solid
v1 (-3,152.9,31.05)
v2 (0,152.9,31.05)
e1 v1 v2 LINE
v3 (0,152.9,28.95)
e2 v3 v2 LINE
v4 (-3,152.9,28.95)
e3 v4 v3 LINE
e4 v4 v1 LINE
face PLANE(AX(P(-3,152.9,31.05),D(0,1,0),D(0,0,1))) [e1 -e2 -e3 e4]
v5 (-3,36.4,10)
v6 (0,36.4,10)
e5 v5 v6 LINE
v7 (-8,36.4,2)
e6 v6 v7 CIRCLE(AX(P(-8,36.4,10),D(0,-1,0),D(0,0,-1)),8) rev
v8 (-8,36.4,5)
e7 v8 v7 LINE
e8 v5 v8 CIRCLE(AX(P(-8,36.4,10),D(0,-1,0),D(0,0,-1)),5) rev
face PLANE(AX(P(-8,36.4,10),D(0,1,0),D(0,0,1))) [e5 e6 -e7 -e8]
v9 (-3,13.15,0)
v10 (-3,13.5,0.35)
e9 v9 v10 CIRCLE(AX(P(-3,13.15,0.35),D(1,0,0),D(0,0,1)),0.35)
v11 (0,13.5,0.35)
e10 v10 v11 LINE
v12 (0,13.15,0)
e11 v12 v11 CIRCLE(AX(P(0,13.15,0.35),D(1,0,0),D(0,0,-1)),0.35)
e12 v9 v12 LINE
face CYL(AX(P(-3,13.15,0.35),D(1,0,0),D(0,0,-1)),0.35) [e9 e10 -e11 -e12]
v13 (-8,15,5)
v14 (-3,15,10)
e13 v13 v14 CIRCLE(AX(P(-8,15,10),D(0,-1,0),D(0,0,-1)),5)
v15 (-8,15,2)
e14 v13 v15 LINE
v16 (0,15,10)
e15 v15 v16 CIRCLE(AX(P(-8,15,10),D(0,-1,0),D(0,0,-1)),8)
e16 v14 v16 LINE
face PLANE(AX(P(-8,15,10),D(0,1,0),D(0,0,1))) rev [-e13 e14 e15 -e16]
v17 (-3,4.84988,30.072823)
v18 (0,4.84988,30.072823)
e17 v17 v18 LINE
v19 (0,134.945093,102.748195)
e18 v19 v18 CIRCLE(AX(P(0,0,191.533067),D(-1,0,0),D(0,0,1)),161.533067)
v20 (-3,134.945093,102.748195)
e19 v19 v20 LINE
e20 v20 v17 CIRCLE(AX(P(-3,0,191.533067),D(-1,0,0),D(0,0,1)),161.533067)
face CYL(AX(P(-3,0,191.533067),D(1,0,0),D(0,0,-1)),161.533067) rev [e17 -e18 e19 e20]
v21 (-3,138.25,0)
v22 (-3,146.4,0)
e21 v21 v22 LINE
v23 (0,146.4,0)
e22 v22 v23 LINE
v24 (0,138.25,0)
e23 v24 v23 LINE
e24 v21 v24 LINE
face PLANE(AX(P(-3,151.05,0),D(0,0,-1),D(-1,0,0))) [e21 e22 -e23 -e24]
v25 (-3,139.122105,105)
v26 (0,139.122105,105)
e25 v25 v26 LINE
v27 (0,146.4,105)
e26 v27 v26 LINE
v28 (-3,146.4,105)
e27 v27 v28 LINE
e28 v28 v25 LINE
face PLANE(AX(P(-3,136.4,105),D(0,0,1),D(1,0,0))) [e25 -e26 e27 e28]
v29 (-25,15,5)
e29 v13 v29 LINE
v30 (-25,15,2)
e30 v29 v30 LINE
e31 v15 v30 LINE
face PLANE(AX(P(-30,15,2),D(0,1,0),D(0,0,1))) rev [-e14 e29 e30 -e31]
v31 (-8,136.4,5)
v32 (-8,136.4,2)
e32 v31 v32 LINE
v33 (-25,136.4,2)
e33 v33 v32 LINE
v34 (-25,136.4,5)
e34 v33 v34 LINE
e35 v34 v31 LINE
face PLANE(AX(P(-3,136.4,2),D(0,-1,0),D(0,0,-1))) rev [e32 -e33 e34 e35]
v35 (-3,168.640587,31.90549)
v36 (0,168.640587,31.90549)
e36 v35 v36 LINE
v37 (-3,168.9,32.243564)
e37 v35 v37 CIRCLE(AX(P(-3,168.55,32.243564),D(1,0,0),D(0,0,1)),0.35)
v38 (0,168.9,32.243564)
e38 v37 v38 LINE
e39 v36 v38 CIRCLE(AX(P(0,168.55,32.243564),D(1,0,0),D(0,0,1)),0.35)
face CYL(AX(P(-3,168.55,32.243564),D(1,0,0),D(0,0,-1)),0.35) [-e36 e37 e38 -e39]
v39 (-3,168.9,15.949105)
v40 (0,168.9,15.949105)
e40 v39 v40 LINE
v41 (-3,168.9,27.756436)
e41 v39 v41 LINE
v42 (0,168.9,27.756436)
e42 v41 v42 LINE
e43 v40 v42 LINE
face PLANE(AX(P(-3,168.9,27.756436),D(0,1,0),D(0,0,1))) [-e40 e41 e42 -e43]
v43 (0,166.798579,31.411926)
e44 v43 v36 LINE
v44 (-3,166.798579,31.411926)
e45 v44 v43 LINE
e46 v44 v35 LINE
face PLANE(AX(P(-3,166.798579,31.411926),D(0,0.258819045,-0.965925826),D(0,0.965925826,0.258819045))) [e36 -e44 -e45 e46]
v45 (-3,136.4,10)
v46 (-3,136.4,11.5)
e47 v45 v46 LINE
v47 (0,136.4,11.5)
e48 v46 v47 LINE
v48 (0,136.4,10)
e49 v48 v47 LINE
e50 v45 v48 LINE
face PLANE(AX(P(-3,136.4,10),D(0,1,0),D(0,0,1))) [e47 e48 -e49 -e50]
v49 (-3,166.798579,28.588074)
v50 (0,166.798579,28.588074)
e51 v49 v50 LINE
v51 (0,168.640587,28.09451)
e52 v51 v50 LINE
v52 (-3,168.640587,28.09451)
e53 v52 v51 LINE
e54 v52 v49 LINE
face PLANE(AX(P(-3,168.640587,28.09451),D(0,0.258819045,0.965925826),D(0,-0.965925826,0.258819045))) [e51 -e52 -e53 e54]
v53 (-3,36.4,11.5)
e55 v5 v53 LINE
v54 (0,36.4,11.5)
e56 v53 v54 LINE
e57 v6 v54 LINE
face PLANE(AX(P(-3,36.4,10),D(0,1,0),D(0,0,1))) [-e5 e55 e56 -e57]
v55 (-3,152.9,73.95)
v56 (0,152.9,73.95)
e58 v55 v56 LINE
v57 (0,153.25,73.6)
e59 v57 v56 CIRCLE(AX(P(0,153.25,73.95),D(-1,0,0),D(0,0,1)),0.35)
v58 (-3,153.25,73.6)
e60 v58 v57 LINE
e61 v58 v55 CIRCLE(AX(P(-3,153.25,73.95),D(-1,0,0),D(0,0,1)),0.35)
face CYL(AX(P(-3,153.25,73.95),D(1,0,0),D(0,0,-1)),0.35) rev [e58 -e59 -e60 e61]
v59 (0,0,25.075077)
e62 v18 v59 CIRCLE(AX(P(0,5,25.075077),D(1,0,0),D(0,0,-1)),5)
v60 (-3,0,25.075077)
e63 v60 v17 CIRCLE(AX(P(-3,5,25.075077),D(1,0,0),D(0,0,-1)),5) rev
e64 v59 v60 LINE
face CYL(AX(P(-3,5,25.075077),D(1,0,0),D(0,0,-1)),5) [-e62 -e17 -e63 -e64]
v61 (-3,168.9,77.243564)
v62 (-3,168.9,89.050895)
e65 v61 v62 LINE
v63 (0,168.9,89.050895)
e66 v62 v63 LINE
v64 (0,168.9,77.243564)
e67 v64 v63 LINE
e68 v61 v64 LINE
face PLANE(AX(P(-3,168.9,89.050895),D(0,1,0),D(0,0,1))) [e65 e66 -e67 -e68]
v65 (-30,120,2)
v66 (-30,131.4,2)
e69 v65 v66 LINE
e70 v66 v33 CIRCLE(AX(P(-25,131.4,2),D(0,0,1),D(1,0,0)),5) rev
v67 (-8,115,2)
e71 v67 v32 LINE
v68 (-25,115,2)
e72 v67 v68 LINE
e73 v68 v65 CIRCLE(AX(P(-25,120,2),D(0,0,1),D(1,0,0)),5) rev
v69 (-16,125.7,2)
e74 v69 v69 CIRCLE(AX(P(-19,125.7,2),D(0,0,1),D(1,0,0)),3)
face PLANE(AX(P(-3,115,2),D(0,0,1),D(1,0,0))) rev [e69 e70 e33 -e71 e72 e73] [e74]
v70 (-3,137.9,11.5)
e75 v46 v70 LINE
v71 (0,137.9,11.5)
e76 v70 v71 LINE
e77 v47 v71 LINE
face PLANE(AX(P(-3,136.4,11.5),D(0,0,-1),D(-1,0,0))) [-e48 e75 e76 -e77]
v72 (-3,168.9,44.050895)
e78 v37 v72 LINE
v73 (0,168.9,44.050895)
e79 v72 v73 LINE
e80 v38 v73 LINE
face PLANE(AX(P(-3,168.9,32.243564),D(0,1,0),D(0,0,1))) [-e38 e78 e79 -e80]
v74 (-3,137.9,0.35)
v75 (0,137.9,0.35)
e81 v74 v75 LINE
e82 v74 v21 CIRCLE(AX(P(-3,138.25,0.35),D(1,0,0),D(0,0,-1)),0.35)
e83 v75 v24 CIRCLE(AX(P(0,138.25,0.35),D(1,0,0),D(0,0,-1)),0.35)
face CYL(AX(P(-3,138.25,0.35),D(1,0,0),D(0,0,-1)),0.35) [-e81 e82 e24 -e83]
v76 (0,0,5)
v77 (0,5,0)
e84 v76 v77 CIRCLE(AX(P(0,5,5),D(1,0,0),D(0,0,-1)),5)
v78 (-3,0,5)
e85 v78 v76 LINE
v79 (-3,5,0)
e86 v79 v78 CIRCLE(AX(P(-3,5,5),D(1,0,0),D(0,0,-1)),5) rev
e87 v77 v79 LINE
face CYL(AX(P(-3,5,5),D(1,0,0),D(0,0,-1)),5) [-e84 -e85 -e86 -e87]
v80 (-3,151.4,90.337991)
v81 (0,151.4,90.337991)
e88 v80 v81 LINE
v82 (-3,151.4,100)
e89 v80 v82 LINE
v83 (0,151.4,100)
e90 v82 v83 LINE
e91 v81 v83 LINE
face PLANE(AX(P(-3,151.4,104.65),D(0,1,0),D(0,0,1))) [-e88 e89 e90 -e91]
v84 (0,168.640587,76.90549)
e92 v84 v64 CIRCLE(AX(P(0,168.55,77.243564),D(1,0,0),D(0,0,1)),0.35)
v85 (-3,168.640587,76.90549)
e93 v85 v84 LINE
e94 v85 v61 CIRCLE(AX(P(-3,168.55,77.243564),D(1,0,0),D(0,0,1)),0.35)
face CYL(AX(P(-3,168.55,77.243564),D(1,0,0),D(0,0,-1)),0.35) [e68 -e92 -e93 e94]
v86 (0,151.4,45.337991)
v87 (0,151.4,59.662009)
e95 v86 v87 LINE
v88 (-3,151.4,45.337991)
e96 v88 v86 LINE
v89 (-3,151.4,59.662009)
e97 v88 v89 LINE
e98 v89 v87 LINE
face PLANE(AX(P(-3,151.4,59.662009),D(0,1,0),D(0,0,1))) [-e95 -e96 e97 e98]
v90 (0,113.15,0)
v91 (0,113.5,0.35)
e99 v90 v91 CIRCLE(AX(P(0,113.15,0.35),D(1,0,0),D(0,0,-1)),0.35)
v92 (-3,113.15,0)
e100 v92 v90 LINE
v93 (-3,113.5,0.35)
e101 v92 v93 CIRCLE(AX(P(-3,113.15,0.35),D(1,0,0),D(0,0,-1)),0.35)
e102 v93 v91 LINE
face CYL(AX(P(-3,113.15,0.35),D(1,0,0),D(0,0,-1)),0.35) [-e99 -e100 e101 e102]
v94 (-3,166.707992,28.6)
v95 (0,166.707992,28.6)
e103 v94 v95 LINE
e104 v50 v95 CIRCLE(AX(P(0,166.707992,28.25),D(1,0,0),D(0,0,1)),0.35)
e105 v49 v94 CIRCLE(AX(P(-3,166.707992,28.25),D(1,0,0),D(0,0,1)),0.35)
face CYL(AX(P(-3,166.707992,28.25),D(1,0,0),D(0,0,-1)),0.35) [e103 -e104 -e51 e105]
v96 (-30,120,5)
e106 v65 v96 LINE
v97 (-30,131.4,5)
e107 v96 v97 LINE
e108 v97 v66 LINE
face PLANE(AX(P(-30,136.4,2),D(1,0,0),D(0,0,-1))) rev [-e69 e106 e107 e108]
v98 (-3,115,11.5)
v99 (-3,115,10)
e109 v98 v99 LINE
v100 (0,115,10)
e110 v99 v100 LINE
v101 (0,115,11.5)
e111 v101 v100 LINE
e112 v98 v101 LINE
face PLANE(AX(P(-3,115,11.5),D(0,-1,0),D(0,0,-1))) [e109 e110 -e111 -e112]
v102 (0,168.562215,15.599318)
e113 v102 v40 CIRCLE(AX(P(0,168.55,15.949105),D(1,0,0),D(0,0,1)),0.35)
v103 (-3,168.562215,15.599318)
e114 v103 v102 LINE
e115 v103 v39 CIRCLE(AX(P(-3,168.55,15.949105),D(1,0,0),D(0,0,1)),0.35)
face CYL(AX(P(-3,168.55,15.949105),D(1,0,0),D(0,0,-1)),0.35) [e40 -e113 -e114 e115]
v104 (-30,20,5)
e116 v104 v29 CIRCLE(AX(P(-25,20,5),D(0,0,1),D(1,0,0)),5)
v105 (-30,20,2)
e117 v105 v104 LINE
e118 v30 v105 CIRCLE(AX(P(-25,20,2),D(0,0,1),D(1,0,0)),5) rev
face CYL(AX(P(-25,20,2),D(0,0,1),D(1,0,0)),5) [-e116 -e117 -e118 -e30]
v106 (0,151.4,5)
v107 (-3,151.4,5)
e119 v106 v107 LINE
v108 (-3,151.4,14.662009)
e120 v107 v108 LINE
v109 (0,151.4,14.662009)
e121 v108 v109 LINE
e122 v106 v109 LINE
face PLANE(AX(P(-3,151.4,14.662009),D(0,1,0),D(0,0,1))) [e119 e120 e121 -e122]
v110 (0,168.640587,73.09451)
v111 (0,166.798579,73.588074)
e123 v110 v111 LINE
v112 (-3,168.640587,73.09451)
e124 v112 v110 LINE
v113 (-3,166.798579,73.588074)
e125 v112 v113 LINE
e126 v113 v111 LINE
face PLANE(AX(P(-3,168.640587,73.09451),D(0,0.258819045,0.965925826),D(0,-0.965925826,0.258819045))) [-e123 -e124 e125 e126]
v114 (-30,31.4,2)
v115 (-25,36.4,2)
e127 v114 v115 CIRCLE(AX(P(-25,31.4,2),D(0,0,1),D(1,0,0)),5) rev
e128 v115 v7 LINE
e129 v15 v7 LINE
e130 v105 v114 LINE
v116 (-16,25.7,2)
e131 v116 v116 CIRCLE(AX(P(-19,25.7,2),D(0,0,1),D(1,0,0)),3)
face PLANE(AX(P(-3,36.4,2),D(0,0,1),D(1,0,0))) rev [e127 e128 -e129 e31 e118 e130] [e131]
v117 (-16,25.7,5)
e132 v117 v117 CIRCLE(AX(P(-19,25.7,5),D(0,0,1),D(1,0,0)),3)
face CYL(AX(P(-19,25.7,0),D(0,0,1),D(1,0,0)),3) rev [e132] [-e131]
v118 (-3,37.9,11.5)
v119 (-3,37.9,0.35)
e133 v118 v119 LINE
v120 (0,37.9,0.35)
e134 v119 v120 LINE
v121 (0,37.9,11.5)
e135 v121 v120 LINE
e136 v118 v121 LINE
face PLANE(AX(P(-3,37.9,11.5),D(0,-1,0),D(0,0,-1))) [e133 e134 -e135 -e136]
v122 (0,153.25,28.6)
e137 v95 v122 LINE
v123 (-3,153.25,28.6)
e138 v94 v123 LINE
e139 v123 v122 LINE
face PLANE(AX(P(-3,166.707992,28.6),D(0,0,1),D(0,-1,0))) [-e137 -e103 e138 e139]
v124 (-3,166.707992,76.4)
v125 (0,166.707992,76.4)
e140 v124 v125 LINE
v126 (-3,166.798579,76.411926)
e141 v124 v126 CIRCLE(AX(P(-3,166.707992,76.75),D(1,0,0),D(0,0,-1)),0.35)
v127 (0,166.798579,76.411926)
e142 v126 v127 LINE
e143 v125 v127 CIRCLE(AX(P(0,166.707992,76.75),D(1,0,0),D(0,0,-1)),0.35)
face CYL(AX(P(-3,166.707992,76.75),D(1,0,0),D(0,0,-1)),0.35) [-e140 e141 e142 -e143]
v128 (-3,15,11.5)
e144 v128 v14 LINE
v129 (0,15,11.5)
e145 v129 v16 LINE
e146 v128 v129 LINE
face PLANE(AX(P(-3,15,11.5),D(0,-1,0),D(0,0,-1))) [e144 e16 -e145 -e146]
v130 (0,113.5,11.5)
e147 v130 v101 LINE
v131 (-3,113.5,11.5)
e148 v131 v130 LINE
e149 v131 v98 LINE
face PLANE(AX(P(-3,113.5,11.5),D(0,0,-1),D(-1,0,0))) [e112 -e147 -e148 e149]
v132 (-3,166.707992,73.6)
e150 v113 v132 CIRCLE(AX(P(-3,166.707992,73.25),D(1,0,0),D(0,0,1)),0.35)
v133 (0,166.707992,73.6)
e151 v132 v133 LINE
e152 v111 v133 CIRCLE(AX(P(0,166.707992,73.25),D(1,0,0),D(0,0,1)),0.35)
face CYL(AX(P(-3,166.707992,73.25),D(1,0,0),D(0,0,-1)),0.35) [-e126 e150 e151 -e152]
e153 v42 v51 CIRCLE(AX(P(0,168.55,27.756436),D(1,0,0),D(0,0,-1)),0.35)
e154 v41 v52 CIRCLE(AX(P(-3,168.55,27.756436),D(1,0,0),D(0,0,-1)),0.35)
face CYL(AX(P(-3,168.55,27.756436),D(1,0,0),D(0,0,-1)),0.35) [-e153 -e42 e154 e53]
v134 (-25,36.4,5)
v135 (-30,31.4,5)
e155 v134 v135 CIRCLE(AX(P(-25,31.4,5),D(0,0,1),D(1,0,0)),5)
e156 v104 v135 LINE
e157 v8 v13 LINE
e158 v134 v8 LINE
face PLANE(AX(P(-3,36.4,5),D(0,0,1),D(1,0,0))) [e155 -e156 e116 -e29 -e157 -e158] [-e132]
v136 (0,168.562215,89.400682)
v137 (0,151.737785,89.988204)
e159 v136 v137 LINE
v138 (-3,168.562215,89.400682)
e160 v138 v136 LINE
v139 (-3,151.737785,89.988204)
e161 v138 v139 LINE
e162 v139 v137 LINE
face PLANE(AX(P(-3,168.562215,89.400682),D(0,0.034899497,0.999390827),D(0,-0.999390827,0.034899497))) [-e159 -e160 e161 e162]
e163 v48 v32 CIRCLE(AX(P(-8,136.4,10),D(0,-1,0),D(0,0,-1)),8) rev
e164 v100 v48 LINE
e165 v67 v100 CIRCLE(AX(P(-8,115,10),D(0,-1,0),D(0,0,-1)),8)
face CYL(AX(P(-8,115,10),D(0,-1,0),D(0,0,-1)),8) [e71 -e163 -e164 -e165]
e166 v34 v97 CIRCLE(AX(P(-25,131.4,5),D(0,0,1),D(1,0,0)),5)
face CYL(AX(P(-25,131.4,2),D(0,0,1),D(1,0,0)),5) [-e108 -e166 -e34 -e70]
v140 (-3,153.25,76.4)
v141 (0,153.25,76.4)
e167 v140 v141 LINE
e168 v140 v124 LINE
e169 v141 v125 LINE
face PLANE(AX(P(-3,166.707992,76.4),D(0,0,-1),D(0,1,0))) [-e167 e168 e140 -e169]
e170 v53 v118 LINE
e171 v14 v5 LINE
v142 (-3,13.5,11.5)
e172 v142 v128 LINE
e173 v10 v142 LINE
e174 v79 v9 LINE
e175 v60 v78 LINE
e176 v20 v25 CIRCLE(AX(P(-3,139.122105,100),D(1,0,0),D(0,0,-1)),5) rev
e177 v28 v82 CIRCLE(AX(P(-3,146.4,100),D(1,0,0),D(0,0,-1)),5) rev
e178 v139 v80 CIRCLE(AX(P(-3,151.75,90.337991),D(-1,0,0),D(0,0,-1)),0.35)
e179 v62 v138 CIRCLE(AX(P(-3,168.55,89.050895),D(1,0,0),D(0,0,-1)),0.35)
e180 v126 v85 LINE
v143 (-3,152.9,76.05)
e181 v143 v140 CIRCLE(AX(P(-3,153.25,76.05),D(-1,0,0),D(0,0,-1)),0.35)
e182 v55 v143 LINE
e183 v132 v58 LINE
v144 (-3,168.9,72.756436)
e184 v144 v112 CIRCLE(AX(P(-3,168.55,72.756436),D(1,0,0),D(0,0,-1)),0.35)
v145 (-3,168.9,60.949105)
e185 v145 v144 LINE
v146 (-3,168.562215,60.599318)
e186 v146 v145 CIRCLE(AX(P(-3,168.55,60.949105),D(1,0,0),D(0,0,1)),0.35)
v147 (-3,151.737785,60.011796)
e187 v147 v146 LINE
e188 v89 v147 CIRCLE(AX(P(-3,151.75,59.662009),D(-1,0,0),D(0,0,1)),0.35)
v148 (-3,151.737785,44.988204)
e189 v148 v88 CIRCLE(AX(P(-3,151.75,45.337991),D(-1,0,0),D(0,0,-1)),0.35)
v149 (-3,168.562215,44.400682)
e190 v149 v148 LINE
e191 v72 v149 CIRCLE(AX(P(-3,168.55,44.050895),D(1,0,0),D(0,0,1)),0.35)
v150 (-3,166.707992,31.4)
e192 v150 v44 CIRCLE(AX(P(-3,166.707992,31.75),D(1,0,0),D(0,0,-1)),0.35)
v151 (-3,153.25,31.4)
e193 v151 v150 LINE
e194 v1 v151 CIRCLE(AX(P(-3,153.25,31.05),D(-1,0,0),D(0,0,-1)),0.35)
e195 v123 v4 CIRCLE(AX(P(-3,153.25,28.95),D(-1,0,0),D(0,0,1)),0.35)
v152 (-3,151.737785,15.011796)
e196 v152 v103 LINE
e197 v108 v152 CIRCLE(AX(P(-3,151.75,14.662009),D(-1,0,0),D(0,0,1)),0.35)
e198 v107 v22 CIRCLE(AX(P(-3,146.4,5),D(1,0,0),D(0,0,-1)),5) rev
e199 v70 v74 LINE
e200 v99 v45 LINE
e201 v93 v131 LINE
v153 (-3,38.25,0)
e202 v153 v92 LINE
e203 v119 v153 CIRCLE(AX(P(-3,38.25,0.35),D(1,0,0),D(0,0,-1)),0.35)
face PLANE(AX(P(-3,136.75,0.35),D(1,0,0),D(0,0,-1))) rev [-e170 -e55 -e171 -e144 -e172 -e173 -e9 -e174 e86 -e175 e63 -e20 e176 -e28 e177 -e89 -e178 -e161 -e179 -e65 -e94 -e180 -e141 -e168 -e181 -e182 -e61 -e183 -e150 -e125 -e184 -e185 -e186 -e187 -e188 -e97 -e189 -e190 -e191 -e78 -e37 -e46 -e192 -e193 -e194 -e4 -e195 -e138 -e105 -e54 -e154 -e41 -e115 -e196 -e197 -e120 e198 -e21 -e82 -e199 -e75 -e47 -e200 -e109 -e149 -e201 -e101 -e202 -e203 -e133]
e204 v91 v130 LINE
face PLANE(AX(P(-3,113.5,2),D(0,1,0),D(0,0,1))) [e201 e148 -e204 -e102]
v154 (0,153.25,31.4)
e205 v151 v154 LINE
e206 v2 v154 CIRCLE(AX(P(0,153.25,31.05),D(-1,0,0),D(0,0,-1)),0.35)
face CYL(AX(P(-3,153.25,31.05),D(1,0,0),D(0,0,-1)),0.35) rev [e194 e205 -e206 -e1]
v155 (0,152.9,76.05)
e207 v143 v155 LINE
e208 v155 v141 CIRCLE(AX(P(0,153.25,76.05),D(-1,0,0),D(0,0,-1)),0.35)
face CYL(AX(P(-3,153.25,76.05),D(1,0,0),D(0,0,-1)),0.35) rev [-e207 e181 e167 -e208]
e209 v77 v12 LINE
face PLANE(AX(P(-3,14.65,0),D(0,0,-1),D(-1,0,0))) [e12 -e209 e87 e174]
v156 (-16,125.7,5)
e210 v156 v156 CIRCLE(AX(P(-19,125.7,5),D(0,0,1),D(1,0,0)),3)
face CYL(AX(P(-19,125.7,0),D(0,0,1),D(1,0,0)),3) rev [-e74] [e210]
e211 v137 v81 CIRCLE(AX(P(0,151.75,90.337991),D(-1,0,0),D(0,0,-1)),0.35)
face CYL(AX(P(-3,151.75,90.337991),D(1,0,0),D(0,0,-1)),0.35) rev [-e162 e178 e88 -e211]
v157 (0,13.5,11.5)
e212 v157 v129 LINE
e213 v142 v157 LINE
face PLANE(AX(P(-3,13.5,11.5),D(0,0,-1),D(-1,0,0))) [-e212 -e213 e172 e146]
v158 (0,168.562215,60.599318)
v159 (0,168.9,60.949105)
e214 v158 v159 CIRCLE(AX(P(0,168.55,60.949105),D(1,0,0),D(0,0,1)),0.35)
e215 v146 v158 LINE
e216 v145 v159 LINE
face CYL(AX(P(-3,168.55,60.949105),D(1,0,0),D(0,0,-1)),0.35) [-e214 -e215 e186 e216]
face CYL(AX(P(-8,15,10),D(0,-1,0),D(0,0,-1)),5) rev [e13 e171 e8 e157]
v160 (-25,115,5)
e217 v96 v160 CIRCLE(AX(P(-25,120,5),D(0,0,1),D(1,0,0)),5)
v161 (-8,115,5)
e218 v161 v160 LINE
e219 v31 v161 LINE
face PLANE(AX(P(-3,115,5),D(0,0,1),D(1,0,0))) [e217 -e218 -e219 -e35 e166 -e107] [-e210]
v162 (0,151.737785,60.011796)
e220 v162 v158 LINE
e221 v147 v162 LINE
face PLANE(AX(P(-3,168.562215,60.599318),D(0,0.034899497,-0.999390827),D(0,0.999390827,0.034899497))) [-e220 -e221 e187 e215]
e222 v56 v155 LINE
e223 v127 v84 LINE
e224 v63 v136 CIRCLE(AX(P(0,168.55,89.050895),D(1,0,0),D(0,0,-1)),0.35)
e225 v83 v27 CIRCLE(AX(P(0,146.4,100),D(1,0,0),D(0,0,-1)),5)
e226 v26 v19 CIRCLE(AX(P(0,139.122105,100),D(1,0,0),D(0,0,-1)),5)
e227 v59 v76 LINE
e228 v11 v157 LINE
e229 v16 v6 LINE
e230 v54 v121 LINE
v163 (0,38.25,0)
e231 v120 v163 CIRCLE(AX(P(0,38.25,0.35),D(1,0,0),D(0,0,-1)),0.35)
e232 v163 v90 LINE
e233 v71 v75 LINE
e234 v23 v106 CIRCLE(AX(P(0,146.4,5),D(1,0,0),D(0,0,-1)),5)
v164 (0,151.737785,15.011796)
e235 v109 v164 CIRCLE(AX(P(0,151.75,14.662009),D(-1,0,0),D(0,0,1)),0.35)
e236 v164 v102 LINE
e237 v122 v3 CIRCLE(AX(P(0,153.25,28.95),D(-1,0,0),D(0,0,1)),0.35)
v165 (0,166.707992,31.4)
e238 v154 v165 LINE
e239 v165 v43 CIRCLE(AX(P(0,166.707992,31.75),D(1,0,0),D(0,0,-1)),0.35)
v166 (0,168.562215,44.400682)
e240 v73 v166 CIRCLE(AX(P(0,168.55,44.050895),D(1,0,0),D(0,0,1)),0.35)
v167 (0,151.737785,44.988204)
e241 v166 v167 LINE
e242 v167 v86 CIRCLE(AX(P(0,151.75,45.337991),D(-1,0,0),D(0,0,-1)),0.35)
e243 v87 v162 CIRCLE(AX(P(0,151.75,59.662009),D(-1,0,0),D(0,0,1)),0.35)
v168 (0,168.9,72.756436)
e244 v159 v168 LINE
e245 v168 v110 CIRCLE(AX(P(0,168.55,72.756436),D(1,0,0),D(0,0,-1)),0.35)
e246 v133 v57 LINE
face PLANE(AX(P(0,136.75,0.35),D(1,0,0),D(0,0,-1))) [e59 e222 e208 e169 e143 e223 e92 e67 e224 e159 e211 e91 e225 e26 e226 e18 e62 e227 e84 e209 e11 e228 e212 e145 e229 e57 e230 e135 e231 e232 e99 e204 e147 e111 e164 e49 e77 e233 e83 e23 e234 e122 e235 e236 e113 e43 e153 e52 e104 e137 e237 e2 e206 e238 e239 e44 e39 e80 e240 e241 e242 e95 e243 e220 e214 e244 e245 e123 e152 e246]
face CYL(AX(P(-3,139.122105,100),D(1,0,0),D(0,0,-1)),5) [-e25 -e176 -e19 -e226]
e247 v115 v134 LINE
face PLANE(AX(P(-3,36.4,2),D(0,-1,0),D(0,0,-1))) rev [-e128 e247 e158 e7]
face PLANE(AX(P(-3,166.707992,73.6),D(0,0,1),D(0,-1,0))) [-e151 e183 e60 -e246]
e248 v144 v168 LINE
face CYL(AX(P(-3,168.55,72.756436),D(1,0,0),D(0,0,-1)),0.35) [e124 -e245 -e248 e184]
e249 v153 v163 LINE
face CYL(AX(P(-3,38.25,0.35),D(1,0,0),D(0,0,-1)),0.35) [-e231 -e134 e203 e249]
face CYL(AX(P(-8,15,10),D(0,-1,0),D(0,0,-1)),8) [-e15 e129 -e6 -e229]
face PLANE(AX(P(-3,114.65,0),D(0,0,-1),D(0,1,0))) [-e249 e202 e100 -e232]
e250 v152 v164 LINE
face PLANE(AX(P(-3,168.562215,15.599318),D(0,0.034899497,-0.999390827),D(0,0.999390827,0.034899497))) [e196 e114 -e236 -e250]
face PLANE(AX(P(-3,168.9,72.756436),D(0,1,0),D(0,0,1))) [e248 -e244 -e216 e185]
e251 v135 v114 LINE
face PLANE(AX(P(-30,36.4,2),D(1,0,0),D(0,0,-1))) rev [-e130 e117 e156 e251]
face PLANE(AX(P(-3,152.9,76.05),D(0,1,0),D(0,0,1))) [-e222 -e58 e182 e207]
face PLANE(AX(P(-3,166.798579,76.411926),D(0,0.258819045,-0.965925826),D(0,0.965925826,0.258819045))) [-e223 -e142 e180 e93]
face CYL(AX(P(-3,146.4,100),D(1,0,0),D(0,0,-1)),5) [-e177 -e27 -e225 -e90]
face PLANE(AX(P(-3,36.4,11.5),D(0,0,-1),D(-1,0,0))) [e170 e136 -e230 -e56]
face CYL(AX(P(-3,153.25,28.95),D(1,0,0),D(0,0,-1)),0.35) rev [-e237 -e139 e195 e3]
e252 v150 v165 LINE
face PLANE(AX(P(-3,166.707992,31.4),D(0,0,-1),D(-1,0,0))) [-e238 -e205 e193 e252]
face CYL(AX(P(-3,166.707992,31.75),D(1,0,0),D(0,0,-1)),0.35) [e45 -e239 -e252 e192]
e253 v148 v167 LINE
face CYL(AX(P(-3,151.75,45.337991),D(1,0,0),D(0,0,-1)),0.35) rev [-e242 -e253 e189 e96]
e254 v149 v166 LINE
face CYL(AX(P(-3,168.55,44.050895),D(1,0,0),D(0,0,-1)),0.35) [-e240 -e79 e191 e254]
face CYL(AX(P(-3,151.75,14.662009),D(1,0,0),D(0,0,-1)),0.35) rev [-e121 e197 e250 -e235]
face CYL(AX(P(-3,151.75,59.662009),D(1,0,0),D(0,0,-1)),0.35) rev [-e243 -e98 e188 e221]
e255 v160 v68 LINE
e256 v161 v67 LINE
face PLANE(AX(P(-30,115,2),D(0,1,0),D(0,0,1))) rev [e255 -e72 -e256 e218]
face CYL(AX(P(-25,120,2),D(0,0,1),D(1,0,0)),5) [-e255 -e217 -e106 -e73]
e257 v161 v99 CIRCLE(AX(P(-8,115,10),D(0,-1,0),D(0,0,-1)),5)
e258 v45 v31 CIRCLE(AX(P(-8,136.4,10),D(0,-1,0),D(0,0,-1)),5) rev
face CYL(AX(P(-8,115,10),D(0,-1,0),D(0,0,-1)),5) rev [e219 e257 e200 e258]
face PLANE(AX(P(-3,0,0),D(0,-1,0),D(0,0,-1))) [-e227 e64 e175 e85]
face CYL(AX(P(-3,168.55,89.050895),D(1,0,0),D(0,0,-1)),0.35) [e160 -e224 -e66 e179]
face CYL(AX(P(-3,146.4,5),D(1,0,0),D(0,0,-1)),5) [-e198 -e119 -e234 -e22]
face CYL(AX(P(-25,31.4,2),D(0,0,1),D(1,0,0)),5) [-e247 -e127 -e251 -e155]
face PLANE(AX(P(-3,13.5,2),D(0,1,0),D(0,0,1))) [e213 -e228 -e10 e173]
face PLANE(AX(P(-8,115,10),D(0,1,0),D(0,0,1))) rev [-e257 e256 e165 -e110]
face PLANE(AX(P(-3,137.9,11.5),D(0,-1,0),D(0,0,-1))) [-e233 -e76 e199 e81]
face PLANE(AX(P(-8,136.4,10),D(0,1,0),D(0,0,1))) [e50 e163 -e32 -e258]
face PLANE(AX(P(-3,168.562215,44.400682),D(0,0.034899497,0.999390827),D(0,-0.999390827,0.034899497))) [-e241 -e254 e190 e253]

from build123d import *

# Parameters (mm, degrees)
BASE_FLANGE1_DEPTH   = 3
EDGE_FLANGE1_START   = 13.5
EDGE_FLANGE1_DEPTH   = 24.4
EDGE_FLANGE1_START_2 = 113.5
EDGE_FLANGE1_2_DEPTH = 24.4
EDGE_FLANGE1_3_DEPTH = 1.5
EDGE_FLANGE1_START_3 = 36.4
EDGE_FLANGE1_4_DEPTH = 1.5
EDGE_FLANGE1_5_DEPTH = 1.5
EDGE_FLANGE1_START_4 = 136.4
EDGE_FLANGE1_6_DEPTH = 1.5
EDGE_FLANGE1_START_5 = 15
EDGE_FLANGE1_7_DEPTH = 21.4
EDGE_FLANGE1_START_6 = 115
EDGE_FLANGE1_8_DEPTH = 21.4
SKETCH12_R           = 3
CUT_EXTRUDE1_DEPTH   = 199.562861583
CUT_EXTRUDE2_DEPTH   = 201.701793714
FILLET1_R            = 5


# Read off the part's stored shape, not the designer's step: Edge-Flange1
# Sheet-metal steps are written as plain solids
with BuildPart() as part:
    # Sketch1 → Base-Flange1 (new body)
    with BuildSketch(Plane(origin=(0, 0, 0), x_dir=(0, 0, -1), z_dir=(1, 0, 0))):
        with BuildLine():
            Line((-89.400682252, 168.562214824), (-89.988204282, 151.737785176))
            ThreePointArc((-89.988204282, 151.737785176), (-90.094860642, 151.49823107), (-90.337991071, 151.4))
            Line((-90.337991071, 151.4), (-104.65, 151.4))
            Line((-104.65, 151.4), (-105, 151.4))
            Line((-105, 151.4), (-105, 151.05))
            Line((-105, 151.05), (-105, 136.592313107))
            Line((-105, 136.592313107), (-105, 136.4))
            Line((-105, 136.4), (-104.837845918, 136.296993093))
            ThreePointArc((-104.837845918, 136.296993093), (-50.024333792, 77.898717236), (-30.000377542, 0.349243281))
            Line((-30.000377542, 0.349243281), (-30, 0))
            Line((-30, 0), (-29.65037836, 0))
            Line((-29.65037836, 0), (-0.35, 0))
            Line((-0.35, 0), (0, 0))
            Line((0, 0), (0, 0.35))
            Line((0, 0.35), (0, 14.65))
            ThreePointArc((0, 14.65), (-0.102512627, 14.897487373), (-0.35, 15))
            Line((-0.35, 15), (-2, 15))
            Line((-2, 15), (-2, 15.7))
            Line((-2, 15.7), (-2, 35.7))
            Line((-2, 35.7), (-2, 36.4))
            Line((-2, 36.4), (-0.35, 36.4))
            ThreePointArc((-0.35, 36.4), (-0.102512627, 36.502512627), (0, 36.75))
            Line((0, 36.75), (0, 114.65))
            ThreePointArc((0, 114.65), (-0.102512627, 114.897487373), (-0.35, 115))
            Line((-0.35, 115), (-2, 115))
            Line((-2, 115), (-2, 115.7))
            Line((-2, 115.7), (-2, 135.7))
            Line((-2, 135.7), (-2, 136.4))
            Line((-2, 136.4), (-0.35, 136.4))
            ThreePointArc((-0.35, 136.4), (-0.102512627, 136.502512627), (0, 136.75))
            Line((0, 136.75), (0, 151.05))
            Line((0, 151.05), (0, 151.4))
            Line((0, 151.4), (-0.35, 151.4))
            Line((-0.35, 151.4), (-14.662008929, 151.4))
            ThreePointArc((-14.662008929, 151.4), (-14.905139358, 151.49823107), (-15.011795718, 151.737785176))
            Line((-15.011795718, 151.737785176), (-15.599317748, 168.562214824))
            ThreePointArc((-15.599317748, 168.562214824), (-15.705974108, 168.80176893), (-15.949104537, 168.9))
            Line((-15.949104537, 168.9), (-27.756435554, 168.9))
            ThreePointArc((-27.756435554, 168.9), (-27.969502054, 168.827673669), (-28.094509593, 168.640586666))
            Line((-28.094509593, 168.640586666), (-28.588074039, 166.798579077))
            ThreePointArc((-28.588074039, 166.798579077), (-28.597005701, 166.753676579), (-28.6, 166.707992411))
            Line((-28.6, 166.707992411), (-28.6, 153.25))
            ThreePointArc((-28.6, 153.25), (-28.702512627, 153.002512627), (-28.95, 152.9))
            Line((-28.95, 152.9), (-31.05, 152.9))
            ThreePointArc((-31.05, 152.9), (-31.297487373, 153.002512627), (-31.4, 153.25))
            Line((-31.4, 153.25), (-31.4, 166.707992411))
            ThreePointArc((-31.4, 166.707992411), (-31.402994299, 166.753676579), (-31.411925961, 166.798579077))
            Line((-31.411925961, 166.798579077), (-31.905490407, 168.640586666))
            ThreePointArc((-31.905490407, 168.640586666), (-32.030497946, 168.827673669), (-32.243564446, 168.9))
            Line((-32.243564446, 168.9), (-44.050895463, 168.9))
            ThreePointArc((-44.050895463, 168.9), (-44.294025892, 168.80176893), (-44.400682252, 168.562214824))
            Line((-44.400682252, 168.562214824), (-44.988204282, 151.737785176))
            ThreePointArc((-44.988204282, 151.737785176), (-45.094860642, 151.49823107), (-45.337991071, 151.4))
            Line((-45.337991071, 151.4), (-59.662008929, 151.4))
            ThreePointArc((-59.662008929, 151.4), (-59.905139358, 151.49823107), (-60.011795718, 151.737785176))
            Line((-60.011795718, 151.737785176), (-60.599317748, 168.562214824))
            ThreePointArc((-60.599317748, 168.562214824), (-60.705974108, 168.80176893), (-60.949104537, 168.9))
            Line((-60.949104537, 168.9), (-72.756435554, 168.9))
            ThreePointArc((-72.756435554, 168.9), (-72.969502054, 168.827673669), (-73.094509593, 168.640586666))
            Line((-73.094509593, 168.640586666), (-73.588074039, 166.798579077))
            ThreePointArc((-73.588074039, 166.798579077), (-73.597005701, 166.753676579), (-73.6, 166.707992411))
            Line((-73.6, 166.707992411), (-73.6, 153.25))
            ThreePointArc((-73.6, 153.25), (-73.702512627, 153.002512627), (-73.95, 152.9))
            Line((-73.95, 152.9), (-76.05, 152.9))
            ThreePointArc((-76.05, 152.9), (-76.297487373, 153.002512627), (-76.4, 153.25))
            Line((-76.4, 153.25), (-76.4, 166.707992411))
            ThreePointArc((-76.4, 166.707992411), (-76.402994299, 166.753676579), (-76.411925961, 166.798579077))
            Line((-76.411925961, 166.798579077), (-76.905490407, 168.640586666))
            ThreePointArc((-76.905490407, 168.640586666), (-77.030497946, 168.827673669), (-77.243564446, 168.9))
            Line((-77.243564446, 168.9), (-89.050895463, 168.9))
            ThreePointArc((-89.050895463, 168.9), (-89.294025892, 168.80176893), (-89.400682252, 168.562214824))
        make_face()
    extrude(amount=-BASE_FLANGE1_DEPTH)

    # Edge-Flange1 outline → Edge-Flange1 (cut)
    with BuildSketch(Plane(origin=(0, 0, 0), x_dir=(1, 0, 0), z_dir=(0, 1, 0)).offset(EDGE_FLANGE1_START)):
        with BuildLine():
            Line((0, -2), (-3, -2))
            Line((-3, -2), (-3, -3.755002002))
            ThreePointArc((-3, -3.755002002), (-0.788897449, -6.535898385), (0, -10))
            Line((0, -10), (0, -2))
        make_face()
    extrude(amount=EDGE_FLANGE1_DEPTH, mode=Mode.SUBTRACT)

    # Edge-Flange1 2 outline → Edge-Flange1 2 (cut)
    with BuildSketch(Plane(origin=(0, 0, 0), x_dir=(1, 0, 0), z_dir=(0, 1, 0)).offset(EDGE_FLANGE1_START_2)):
        with BuildLine():
            Line((0, -2), (-3, -2))
            Line((-3, -2), (-3, -3.755002002))
            ThreePointArc((-3, -3.755002002), (-0.788897449, -6.535898385), (0, -10))
            Line((0, -10), (0, -2))
        make_face()
    extrude(amount=EDGE_FLANGE1_2_DEPTH, mode=Mode.SUBTRACT)

    # Edge-Flange1 3 outline → Edge-Flange1 3 (cut)
    with BuildSketch(Plane(origin=(0, 0, 0), x_dir=(1, 0, 0), z_dir=(0, 1, 0)).offset(EDGE_FLANGE1_START)):
        with BuildLine():
            ThreePointArc((0, -10), (-0.788897449, -6.535898385), (-3, -3.755002002))
            Line((-3, -3.755002002), (-3, -11.5))
            Line((-3, -11.5), (0, -11.5))
            Line((0, -11.5), (0, -10))
        make_face()
    extrude(amount=EDGE_FLANGE1_3_DEPTH, mode=Mode.SUBTRACT)

    # Edge-Flange1 4 outline → Edge-Flange1 4 (cut)
    with BuildSketch(Plane(origin=(0, 0, 0), x_dir=(1, 0, 0), z_dir=(0, 1, 0)).offset(EDGE_FLANGE1_START_3)):
        with BuildLine():
            ThreePointArc((0, -10), (-0.788897449, -6.535898385), (-3, -3.755002002))
            Line((-3, -3.755002002), (-3, -11.5))
            Line((-3, -11.5), (0, -11.5))
            Line((0, -11.5), (0, -10))
        make_face()
    extrude(amount=EDGE_FLANGE1_4_DEPTH, mode=Mode.SUBTRACT)

    # Edge-Flange1 5 outline → Edge-Flange1 5 (cut)
    with BuildSketch(Plane(origin=(0, 0, 0), x_dir=(1, 0, 0), z_dir=(0, 1, 0)).offset(EDGE_FLANGE1_START_2)):
        with BuildLine():
            ThreePointArc((0, -10), (-0.788897449, -6.535898385), (-3, -3.755002002))
            Line((-3, -3.755002002), (-3, -11.5))
            Line((-3, -11.5), (0, -11.5))
            Line((0, -11.5), (0, -10))
        make_face()
    extrude(amount=EDGE_FLANGE1_5_DEPTH, mode=Mode.SUBTRACT)

    # Edge-Flange1 6 outline → Edge-Flange1 6 (cut)
    with BuildSketch(Plane(origin=(0, 0, 0), x_dir=(1, 0, 0), z_dir=(0, 1, 0)).offset(EDGE_FLANGE1_START_4)):
        with BuildLine():
            ThreePointArc((0, -10), (-0.788897449, -6.535898385), (-3, -3.755002002))
            Line((-3, -3.755002002), (-3, -11.5))
            Line((-3, -11.5), (0, -11.5))
            Line((0, -11.5), (0, -10))
        make_face()
    extrude(amount=EDGE_FLANGE1_6_DEPTH, mode=Mode.SUBTRACT)

    # Edge-Flange1 7 outline → Edge-Flange1 7 (add)
    with BuildSketch(Plane(origin=(0, 0, 0), x_dir=(1, 0, 0), z_dir=(0, 1, 0)).offset(EDGE_FLANGE1_START_5)):
        with BuildLine():
            Line((-3, -10), (-3, -3.755002002))
            ThreePointArc((-3, -3.755002002), (-5.350470229, -2.451490744), (-8, -2))
            Line((-8, -2), (-30, -2))
            Line((-30, -2), (-30, -5))
            Line((-30, -5), (-8, -5))
            ThreePointArc((-8, -5), (-4.464466094, -6.464466094), (-3, -10))
        make_face()
    extrude(amount=EDGE_FLANGE1_7_DEPTH)

    # Edge-Flange1 8 outline → Edge-Flange1 8 (add)
    with BuildSketch(Plane(origin=(0, 0, 0), x_dir=(1, 0, 0), z_dir=(0, 1, 0)).offset(EDGE_FLANGE1_START_6)):
        with BuildLine():
            Line((-3, -10), (-3, -3.755002002))
            ThreePointArc((-3, -3.755002002), (-5.350470229, -2.451490744), (-8, -2))
            Line((-8, -2), (-30, -2))
            Line((-30, -2), (-30, -5))
            Line((-30, -5), (-8, -5))
            ThreePointArc((-8, -5), (-4.464466094, -6.464466094), (-3, -10))
        make_face()
    extrude(amount=EDGE_FLANGE1_8_DEPTH)

    # Sketch12 → Cut-Extrude1 (cut, through all)
    with BuildSketch(Plane.XY.offset(5)):
        with Locations((-19, 125.7)):
            Circle(SKETCH12_R)
        with Locations((-19, 25.7)):
            Circle(SKETCH12_R)
    extrude(amount=-CUT_EXTRUDE1_DEPTH, mode=Mode.SUBTRACT)

    # Sketch14 → Cut-Extrude2 (cut, through all)
    with BuildSketch(Plane.ZY.offset(3)):
        with BuildLine():
            Line((2, 136.4), (0, 136.4))
            Line((0, 136.4), (0, 137.9))
            Line((0, 137.9), (0, 138.25))
            ThreePointArc((0, 138.25), (0.102512627, 138.002512627), (0.35, 137.9))
            Line((0.35, 137.9), (2, 137.9))
            Line((2, 137.9), (2, 136.4))
        make_face()
        with BuildLine():
            Line((2, 115), (0, 115))
            Line((0, 115), (0, 113.5))
            Line((0, 113.5), (0, 113.15))
            ThreePointArc((0, 113.15), (0.102512627, 113.397487373), (0.35, 113.5))
            Line((0.35, 113.5), (2, 113.5))
            Line((2, 113.5), (2, 115))
        make_face()
        with BuildLine():
            Line((2, 36.4), (0, 36.4))
            Line((0, 36.4), (0, 37.9))
            Line((0, 37.9), (0, 38.25))
            ThreePointArc((0, 38.25), (0.102512627, 38.002512627), (0.35, 37.9))
            Line((0.35, 37.9), (2, 37.9))
            Line((2, 37.9), (2, 36.4))
        make_face()
        with BuildLine():
            Line((2, 13.5), (2, 15))
            Line((2, 15), (0, 15))
            Line((0, 15), (0, 13.5))
            Line((0, 13.5), (0, 13.15))
            ThreePointArc((0, 13.15), (0.102512627, 13.397487373), (0.35, 13.5))
            Line((0.35, 13.5), (2, 13.5))
        make_face()
    extrude(amount=-CUT_EXTRUDE2_DEPTH, mode=Mode.SUBTRACT)

    # Fillet1
    fillet1_edges = [part.edges().sort_by_distance(p)[0] for p in [
        (-1.5, 136.4, 105),
        (-1.5, 151.4, 105),
        (-1.5, 151.4, 0),
        (-30, 115, 3.5),
        (-30, 136.4, 3.5),
        (-30, 36.4, 3.5),
        (-30, 15, 3.5),
        (-1.5, 0, 30),
        (-1.5, 0, 0),
    ]]
    fillet(fillet1_edges, radius=FILLET1_R)


solid = part.part
